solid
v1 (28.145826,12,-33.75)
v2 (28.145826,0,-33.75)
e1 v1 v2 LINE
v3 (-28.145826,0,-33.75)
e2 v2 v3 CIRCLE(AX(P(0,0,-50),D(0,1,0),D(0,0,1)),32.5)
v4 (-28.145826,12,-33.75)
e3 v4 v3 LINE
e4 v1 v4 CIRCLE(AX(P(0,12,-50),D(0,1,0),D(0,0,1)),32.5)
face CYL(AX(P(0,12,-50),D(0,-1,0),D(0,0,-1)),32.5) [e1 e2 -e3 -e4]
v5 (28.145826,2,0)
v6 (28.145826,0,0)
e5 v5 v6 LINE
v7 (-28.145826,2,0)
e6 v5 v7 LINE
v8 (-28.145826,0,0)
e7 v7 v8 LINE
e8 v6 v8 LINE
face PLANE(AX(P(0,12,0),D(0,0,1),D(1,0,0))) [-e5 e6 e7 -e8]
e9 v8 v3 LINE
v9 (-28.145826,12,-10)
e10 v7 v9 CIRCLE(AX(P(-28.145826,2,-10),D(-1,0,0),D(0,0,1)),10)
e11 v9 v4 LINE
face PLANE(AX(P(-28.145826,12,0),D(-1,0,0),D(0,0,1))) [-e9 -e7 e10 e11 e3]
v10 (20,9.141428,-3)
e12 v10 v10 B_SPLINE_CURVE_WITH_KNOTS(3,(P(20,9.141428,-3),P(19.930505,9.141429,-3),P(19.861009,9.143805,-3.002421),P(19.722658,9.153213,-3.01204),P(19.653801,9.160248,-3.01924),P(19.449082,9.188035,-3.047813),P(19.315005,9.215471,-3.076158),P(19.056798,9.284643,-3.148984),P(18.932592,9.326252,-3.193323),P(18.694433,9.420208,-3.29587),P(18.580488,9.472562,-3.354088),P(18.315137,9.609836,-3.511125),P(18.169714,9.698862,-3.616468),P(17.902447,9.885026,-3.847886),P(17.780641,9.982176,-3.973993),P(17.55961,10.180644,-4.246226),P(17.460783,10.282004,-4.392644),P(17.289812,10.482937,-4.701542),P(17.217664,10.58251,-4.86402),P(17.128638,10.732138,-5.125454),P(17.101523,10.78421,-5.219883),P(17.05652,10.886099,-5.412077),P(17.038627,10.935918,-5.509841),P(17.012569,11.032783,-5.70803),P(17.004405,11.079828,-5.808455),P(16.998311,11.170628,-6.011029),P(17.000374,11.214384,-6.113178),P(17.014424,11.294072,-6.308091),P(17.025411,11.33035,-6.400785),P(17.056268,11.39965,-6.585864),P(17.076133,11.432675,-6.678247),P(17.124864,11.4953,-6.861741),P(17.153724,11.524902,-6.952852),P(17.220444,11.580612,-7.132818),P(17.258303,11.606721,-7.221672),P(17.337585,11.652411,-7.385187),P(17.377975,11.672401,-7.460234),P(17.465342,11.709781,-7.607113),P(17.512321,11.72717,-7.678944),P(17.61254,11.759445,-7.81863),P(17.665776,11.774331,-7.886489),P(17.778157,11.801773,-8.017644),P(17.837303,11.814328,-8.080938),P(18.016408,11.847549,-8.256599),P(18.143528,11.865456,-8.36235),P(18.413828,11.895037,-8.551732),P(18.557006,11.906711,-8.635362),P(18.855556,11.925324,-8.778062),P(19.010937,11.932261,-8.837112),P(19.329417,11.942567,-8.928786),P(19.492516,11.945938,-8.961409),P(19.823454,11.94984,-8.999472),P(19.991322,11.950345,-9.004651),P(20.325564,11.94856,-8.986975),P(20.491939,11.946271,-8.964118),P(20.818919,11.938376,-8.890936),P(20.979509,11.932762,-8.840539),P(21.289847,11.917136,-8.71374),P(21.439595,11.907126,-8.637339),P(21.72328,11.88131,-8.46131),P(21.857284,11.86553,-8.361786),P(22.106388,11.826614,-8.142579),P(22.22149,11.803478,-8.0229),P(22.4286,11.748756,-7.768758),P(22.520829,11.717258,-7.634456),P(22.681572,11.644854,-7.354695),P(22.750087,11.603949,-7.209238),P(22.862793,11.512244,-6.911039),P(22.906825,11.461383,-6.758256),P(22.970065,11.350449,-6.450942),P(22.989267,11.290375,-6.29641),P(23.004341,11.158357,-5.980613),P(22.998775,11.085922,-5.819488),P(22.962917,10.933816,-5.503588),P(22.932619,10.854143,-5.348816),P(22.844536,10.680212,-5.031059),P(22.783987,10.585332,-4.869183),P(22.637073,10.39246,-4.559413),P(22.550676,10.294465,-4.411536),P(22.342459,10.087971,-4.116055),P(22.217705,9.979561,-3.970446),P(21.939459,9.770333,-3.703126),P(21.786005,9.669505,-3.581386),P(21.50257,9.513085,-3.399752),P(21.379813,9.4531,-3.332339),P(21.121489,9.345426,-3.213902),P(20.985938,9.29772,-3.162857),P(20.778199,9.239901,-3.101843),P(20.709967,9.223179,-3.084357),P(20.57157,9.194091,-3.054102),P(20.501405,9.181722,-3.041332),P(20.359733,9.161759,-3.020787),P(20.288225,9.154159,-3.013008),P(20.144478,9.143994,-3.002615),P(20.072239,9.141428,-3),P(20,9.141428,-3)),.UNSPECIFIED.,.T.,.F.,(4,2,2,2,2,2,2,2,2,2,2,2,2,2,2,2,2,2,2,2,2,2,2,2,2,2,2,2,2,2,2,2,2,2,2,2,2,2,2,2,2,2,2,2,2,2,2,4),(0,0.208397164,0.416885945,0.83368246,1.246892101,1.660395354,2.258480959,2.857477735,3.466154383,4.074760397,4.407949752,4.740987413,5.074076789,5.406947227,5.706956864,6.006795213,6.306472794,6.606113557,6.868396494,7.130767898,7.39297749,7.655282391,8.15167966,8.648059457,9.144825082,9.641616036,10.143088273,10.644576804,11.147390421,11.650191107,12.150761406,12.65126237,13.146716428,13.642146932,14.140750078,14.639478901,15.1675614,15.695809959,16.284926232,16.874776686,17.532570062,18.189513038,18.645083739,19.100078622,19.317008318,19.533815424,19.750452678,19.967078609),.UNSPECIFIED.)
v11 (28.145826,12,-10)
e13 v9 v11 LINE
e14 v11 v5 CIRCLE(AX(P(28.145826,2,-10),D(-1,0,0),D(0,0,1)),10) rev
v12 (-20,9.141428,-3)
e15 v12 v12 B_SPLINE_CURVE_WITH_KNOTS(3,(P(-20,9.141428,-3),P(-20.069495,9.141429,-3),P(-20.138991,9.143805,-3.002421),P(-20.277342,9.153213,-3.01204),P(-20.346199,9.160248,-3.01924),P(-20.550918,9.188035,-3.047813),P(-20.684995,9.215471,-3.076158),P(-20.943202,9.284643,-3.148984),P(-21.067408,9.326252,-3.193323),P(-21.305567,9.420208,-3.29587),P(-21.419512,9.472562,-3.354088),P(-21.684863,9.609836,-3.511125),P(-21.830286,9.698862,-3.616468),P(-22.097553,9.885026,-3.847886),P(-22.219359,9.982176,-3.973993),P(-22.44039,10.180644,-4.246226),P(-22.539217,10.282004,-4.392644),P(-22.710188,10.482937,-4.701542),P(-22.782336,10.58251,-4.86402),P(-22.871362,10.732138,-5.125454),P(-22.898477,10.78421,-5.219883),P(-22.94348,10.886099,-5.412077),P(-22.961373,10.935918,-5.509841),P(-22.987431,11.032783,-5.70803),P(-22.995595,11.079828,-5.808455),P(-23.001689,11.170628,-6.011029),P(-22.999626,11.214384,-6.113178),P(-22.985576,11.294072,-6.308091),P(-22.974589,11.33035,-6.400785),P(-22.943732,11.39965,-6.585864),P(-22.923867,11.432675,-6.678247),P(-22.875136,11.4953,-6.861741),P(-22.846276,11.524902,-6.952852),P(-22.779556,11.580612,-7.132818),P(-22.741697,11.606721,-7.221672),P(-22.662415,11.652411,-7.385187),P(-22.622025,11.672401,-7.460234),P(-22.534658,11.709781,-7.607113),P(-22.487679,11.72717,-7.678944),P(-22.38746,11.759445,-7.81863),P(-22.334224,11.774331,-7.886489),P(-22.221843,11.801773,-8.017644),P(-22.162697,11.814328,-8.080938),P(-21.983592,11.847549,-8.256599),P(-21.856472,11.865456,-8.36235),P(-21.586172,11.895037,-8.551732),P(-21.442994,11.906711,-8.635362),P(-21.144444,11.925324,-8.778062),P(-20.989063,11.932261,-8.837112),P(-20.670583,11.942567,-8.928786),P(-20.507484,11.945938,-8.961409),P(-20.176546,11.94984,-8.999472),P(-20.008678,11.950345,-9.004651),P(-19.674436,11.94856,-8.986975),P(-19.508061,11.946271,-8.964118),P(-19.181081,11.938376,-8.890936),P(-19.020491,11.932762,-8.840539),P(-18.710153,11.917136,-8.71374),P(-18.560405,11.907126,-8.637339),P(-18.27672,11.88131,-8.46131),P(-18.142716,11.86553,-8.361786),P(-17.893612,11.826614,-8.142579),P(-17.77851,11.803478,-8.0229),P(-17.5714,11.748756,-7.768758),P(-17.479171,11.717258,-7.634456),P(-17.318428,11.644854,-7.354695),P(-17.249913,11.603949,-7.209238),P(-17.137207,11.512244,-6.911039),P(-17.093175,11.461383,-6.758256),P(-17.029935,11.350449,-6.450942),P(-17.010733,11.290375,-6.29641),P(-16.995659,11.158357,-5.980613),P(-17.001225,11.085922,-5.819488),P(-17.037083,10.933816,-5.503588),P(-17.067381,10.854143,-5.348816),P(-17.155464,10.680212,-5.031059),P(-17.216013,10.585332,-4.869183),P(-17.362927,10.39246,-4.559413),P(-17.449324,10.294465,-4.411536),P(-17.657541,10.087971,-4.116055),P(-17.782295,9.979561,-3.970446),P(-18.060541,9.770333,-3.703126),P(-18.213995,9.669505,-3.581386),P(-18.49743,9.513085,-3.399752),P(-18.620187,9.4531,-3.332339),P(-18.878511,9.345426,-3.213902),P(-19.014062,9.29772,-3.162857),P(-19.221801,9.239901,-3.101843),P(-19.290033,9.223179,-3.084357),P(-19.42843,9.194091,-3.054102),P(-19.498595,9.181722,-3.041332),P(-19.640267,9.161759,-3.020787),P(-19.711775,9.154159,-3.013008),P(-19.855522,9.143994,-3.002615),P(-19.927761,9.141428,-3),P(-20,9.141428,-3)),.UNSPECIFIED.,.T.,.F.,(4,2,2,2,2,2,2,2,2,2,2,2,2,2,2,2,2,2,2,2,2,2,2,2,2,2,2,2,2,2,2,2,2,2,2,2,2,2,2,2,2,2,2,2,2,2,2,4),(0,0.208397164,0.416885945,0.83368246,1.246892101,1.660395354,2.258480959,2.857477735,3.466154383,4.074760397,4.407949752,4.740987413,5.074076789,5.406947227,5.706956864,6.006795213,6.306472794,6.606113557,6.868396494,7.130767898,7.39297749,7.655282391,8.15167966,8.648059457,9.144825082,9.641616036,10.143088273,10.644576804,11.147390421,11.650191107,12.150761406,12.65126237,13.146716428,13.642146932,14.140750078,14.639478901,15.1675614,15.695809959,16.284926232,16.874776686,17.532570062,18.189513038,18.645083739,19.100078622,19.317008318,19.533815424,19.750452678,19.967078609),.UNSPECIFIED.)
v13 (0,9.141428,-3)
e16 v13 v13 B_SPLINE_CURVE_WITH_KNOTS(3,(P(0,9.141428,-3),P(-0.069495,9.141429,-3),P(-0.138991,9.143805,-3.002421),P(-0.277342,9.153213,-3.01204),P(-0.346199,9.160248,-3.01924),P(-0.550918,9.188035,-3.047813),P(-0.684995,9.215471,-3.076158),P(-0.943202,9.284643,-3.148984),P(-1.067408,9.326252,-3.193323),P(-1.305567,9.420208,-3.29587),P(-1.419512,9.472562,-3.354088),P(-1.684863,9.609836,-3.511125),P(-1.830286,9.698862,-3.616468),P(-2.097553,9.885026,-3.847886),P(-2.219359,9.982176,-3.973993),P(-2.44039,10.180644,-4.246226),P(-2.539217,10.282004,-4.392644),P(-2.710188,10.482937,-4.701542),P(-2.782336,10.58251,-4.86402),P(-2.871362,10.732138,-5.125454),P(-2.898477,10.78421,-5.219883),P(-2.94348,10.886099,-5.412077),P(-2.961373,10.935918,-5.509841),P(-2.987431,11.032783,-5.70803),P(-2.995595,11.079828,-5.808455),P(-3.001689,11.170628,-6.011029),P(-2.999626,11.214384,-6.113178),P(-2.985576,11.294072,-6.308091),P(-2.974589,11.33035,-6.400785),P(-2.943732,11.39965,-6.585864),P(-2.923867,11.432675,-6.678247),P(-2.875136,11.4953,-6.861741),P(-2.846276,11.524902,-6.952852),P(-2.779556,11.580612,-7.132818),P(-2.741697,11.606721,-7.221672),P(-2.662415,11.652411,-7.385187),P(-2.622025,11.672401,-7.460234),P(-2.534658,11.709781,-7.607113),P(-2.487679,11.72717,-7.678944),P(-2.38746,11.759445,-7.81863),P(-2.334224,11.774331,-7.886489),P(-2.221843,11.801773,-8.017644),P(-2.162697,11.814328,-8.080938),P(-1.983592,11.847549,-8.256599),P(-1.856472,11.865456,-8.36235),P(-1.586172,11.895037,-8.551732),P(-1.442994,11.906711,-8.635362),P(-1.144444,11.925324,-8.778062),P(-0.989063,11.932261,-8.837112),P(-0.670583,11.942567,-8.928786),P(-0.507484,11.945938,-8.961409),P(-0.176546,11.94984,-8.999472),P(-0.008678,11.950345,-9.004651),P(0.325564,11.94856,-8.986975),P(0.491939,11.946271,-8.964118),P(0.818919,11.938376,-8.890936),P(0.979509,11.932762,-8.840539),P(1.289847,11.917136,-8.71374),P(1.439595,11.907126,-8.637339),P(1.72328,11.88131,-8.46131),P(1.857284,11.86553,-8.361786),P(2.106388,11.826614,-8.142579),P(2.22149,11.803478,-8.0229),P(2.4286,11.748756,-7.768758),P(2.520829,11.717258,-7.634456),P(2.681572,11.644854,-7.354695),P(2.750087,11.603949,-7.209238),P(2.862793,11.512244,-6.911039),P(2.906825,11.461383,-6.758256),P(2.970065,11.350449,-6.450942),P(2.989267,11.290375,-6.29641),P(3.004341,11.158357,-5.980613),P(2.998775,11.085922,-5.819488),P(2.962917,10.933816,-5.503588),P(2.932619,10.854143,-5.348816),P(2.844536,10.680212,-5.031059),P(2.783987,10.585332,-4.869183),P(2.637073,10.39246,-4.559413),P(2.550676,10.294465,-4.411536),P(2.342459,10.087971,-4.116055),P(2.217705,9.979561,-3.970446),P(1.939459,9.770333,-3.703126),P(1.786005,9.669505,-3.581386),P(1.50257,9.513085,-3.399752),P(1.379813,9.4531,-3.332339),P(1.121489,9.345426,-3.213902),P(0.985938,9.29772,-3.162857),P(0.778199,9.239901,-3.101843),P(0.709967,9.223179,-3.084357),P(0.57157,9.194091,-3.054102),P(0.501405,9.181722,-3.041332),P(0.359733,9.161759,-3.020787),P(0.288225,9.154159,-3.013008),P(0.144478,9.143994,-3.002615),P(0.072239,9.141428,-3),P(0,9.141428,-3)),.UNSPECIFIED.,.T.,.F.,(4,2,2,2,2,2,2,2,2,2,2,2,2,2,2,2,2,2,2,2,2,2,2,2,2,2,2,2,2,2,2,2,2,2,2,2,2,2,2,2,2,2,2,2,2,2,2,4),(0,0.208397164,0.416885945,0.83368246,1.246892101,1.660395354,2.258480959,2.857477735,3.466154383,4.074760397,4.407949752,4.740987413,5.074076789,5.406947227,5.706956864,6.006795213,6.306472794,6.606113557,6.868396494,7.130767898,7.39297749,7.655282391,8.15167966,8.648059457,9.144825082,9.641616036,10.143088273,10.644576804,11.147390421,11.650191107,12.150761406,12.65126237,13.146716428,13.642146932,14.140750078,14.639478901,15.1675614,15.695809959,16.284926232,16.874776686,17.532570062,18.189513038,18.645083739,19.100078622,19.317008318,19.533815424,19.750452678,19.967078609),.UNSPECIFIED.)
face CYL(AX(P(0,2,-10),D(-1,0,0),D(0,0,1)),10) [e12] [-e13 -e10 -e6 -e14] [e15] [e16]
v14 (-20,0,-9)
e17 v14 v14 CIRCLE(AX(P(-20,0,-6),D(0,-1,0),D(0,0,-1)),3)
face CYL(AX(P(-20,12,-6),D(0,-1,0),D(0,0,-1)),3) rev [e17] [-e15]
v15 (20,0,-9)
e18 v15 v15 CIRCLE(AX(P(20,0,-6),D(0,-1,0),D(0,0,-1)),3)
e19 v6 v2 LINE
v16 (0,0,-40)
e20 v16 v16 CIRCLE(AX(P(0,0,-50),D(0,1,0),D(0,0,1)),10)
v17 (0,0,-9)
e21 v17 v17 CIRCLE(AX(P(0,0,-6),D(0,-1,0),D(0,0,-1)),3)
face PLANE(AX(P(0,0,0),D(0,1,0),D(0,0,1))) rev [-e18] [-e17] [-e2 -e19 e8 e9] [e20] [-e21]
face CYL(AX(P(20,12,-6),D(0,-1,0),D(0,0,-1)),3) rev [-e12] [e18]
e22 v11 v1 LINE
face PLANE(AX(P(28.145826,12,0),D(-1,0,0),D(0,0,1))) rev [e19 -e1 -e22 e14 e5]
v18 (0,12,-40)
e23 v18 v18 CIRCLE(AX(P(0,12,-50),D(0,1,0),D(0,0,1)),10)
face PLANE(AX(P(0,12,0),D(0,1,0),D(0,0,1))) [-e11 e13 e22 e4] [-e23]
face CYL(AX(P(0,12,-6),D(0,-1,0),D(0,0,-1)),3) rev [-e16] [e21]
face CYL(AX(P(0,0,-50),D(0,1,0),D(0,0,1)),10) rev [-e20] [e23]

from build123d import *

# Parameters (mm, degrees)
EXTRUDE_1_DEPTH     = 12
SKETCH_2_R          = 3
CUT_EXTRUDE_1_DEPTH = 12
FILLET_1_R          = 10
SKETCH_3_R          = 10
CUT_EXTRUDE_2_DEPTH = 12


with BuildPart() as part:
    # 草图1 → 凸台-拉伸1 (new body)
    with BuildSketch(Plane(origin=(0, 0, 0), x_dir=(1, 0, 0), z_dir=(0, 1, 0))):
        with BuildLine():
            Line((-28.145825623, 33.75), (0, 50))
            Line((0, 50), (28.145825623, 33.75))
            ThreePointArc((28.145825623, 33.75), (31.392589354, 41.588381034), (32.5, 50))
            ThreePointArc((32.5, 50), (-8.411618966, 81.392589354), (-28.145825623, 33.75))
        make_face()
        with BuildLine():
            Line((0, 50), (0, 17.5))
            ThreePointArc((0, 17.5), (16.25, 21.854174377), (28.145825623, 33.75))
            Line((28.145825623, 33.75), (0, 50))
        make_face()
        with BuildLine():
            ThreePointArc((-28.145825623, 33.75), (-16.25, 21.854174377), (0, 17.5))
            Line((0, 17.5), (0, 50))
            Line((0, 50), (-28.145825623, 33.75))
        make_face()
        with BuildLine():
            Line((-28.145825623, 0), (0, 0))
            Line((0, 0), (0, 17.5))
            ThreePointArc((0, 17.5), (-16.25, 21.854174377), (-28.145825623, 33.75))
            Line((-28.145825623, 33.75), (-28.145825623, 0))
        make_face()
        with BuildLine():
            Line((0, 17.5), (0, 0))
            Line((0, 0), (28.145825623, 0))
            Line((28.145825623, 0), (28.145825623, 33.75))
            ThreePointArc((28.145825623, 33.75), (16.25, 21.854174377), (0, 17.5))
        make_face()
    extrude(amount=EXTRUDE_1_DEPTH)

    # 草图2 → 切除-拉伸1 (cut)
    with BuildSketch(Plane(origin=(0, 0, 0), x_dir=(-1, 0, 0), z_dir=(0, -1, 0))):
        with Locations(Location((0, 6, 0), (0, 0, 90))):
            Circle(SKETCH_2_R)
        with Locations(Location((20, 6, 0), (0, 0, 90))):
            Circle(SKETCH_2_R)
        with Locations(Location((-20, 6, 0), (0, 0, 90))):
            Circle(SKETCH_2_R)
    extrude(amount=-CUT_EXTRUDE_1_DEPTH, mode=Mode.SUBTRACT)

    # 圆角1
    # the kernel refuses this fillet: 10 mm, written as the material it takes off along each edge
    with BuildSketch(Plane(origin=(-53.145825623, 12, 0), x_dir=(0, 0, -1), z_dir=(1, 0, 0))) as fillet_1_piece_1:
        with BuildLine():
            CenterArc((FILLET_1_R, -FILLET_1_R), FILLET_1_R, 90, 90)
            Line((0, -FILLET_1_R), (0, 0))
            Line((0, 0), (FILLET_1_R, 0))
        make_face()
    extrude(amount=106.291651246, mode=Mode.SUBTRACT)

    # 草图3 → 切除-拉伸2 (cut)
    with BuildSketch(Plane(origin=(0, 12, 0), x_dir=(1, 0, 0), z_dir=(0, 1, 0))):
        with Locations(Location((0, 50, 0), (0, 0, 270))):
            Circle(SKETCH_3_R)
    extrude(amount=-CUT_EXTRUDE_2_DEPTH, mode=Mode.SUBTRACT)


solid = part.part
